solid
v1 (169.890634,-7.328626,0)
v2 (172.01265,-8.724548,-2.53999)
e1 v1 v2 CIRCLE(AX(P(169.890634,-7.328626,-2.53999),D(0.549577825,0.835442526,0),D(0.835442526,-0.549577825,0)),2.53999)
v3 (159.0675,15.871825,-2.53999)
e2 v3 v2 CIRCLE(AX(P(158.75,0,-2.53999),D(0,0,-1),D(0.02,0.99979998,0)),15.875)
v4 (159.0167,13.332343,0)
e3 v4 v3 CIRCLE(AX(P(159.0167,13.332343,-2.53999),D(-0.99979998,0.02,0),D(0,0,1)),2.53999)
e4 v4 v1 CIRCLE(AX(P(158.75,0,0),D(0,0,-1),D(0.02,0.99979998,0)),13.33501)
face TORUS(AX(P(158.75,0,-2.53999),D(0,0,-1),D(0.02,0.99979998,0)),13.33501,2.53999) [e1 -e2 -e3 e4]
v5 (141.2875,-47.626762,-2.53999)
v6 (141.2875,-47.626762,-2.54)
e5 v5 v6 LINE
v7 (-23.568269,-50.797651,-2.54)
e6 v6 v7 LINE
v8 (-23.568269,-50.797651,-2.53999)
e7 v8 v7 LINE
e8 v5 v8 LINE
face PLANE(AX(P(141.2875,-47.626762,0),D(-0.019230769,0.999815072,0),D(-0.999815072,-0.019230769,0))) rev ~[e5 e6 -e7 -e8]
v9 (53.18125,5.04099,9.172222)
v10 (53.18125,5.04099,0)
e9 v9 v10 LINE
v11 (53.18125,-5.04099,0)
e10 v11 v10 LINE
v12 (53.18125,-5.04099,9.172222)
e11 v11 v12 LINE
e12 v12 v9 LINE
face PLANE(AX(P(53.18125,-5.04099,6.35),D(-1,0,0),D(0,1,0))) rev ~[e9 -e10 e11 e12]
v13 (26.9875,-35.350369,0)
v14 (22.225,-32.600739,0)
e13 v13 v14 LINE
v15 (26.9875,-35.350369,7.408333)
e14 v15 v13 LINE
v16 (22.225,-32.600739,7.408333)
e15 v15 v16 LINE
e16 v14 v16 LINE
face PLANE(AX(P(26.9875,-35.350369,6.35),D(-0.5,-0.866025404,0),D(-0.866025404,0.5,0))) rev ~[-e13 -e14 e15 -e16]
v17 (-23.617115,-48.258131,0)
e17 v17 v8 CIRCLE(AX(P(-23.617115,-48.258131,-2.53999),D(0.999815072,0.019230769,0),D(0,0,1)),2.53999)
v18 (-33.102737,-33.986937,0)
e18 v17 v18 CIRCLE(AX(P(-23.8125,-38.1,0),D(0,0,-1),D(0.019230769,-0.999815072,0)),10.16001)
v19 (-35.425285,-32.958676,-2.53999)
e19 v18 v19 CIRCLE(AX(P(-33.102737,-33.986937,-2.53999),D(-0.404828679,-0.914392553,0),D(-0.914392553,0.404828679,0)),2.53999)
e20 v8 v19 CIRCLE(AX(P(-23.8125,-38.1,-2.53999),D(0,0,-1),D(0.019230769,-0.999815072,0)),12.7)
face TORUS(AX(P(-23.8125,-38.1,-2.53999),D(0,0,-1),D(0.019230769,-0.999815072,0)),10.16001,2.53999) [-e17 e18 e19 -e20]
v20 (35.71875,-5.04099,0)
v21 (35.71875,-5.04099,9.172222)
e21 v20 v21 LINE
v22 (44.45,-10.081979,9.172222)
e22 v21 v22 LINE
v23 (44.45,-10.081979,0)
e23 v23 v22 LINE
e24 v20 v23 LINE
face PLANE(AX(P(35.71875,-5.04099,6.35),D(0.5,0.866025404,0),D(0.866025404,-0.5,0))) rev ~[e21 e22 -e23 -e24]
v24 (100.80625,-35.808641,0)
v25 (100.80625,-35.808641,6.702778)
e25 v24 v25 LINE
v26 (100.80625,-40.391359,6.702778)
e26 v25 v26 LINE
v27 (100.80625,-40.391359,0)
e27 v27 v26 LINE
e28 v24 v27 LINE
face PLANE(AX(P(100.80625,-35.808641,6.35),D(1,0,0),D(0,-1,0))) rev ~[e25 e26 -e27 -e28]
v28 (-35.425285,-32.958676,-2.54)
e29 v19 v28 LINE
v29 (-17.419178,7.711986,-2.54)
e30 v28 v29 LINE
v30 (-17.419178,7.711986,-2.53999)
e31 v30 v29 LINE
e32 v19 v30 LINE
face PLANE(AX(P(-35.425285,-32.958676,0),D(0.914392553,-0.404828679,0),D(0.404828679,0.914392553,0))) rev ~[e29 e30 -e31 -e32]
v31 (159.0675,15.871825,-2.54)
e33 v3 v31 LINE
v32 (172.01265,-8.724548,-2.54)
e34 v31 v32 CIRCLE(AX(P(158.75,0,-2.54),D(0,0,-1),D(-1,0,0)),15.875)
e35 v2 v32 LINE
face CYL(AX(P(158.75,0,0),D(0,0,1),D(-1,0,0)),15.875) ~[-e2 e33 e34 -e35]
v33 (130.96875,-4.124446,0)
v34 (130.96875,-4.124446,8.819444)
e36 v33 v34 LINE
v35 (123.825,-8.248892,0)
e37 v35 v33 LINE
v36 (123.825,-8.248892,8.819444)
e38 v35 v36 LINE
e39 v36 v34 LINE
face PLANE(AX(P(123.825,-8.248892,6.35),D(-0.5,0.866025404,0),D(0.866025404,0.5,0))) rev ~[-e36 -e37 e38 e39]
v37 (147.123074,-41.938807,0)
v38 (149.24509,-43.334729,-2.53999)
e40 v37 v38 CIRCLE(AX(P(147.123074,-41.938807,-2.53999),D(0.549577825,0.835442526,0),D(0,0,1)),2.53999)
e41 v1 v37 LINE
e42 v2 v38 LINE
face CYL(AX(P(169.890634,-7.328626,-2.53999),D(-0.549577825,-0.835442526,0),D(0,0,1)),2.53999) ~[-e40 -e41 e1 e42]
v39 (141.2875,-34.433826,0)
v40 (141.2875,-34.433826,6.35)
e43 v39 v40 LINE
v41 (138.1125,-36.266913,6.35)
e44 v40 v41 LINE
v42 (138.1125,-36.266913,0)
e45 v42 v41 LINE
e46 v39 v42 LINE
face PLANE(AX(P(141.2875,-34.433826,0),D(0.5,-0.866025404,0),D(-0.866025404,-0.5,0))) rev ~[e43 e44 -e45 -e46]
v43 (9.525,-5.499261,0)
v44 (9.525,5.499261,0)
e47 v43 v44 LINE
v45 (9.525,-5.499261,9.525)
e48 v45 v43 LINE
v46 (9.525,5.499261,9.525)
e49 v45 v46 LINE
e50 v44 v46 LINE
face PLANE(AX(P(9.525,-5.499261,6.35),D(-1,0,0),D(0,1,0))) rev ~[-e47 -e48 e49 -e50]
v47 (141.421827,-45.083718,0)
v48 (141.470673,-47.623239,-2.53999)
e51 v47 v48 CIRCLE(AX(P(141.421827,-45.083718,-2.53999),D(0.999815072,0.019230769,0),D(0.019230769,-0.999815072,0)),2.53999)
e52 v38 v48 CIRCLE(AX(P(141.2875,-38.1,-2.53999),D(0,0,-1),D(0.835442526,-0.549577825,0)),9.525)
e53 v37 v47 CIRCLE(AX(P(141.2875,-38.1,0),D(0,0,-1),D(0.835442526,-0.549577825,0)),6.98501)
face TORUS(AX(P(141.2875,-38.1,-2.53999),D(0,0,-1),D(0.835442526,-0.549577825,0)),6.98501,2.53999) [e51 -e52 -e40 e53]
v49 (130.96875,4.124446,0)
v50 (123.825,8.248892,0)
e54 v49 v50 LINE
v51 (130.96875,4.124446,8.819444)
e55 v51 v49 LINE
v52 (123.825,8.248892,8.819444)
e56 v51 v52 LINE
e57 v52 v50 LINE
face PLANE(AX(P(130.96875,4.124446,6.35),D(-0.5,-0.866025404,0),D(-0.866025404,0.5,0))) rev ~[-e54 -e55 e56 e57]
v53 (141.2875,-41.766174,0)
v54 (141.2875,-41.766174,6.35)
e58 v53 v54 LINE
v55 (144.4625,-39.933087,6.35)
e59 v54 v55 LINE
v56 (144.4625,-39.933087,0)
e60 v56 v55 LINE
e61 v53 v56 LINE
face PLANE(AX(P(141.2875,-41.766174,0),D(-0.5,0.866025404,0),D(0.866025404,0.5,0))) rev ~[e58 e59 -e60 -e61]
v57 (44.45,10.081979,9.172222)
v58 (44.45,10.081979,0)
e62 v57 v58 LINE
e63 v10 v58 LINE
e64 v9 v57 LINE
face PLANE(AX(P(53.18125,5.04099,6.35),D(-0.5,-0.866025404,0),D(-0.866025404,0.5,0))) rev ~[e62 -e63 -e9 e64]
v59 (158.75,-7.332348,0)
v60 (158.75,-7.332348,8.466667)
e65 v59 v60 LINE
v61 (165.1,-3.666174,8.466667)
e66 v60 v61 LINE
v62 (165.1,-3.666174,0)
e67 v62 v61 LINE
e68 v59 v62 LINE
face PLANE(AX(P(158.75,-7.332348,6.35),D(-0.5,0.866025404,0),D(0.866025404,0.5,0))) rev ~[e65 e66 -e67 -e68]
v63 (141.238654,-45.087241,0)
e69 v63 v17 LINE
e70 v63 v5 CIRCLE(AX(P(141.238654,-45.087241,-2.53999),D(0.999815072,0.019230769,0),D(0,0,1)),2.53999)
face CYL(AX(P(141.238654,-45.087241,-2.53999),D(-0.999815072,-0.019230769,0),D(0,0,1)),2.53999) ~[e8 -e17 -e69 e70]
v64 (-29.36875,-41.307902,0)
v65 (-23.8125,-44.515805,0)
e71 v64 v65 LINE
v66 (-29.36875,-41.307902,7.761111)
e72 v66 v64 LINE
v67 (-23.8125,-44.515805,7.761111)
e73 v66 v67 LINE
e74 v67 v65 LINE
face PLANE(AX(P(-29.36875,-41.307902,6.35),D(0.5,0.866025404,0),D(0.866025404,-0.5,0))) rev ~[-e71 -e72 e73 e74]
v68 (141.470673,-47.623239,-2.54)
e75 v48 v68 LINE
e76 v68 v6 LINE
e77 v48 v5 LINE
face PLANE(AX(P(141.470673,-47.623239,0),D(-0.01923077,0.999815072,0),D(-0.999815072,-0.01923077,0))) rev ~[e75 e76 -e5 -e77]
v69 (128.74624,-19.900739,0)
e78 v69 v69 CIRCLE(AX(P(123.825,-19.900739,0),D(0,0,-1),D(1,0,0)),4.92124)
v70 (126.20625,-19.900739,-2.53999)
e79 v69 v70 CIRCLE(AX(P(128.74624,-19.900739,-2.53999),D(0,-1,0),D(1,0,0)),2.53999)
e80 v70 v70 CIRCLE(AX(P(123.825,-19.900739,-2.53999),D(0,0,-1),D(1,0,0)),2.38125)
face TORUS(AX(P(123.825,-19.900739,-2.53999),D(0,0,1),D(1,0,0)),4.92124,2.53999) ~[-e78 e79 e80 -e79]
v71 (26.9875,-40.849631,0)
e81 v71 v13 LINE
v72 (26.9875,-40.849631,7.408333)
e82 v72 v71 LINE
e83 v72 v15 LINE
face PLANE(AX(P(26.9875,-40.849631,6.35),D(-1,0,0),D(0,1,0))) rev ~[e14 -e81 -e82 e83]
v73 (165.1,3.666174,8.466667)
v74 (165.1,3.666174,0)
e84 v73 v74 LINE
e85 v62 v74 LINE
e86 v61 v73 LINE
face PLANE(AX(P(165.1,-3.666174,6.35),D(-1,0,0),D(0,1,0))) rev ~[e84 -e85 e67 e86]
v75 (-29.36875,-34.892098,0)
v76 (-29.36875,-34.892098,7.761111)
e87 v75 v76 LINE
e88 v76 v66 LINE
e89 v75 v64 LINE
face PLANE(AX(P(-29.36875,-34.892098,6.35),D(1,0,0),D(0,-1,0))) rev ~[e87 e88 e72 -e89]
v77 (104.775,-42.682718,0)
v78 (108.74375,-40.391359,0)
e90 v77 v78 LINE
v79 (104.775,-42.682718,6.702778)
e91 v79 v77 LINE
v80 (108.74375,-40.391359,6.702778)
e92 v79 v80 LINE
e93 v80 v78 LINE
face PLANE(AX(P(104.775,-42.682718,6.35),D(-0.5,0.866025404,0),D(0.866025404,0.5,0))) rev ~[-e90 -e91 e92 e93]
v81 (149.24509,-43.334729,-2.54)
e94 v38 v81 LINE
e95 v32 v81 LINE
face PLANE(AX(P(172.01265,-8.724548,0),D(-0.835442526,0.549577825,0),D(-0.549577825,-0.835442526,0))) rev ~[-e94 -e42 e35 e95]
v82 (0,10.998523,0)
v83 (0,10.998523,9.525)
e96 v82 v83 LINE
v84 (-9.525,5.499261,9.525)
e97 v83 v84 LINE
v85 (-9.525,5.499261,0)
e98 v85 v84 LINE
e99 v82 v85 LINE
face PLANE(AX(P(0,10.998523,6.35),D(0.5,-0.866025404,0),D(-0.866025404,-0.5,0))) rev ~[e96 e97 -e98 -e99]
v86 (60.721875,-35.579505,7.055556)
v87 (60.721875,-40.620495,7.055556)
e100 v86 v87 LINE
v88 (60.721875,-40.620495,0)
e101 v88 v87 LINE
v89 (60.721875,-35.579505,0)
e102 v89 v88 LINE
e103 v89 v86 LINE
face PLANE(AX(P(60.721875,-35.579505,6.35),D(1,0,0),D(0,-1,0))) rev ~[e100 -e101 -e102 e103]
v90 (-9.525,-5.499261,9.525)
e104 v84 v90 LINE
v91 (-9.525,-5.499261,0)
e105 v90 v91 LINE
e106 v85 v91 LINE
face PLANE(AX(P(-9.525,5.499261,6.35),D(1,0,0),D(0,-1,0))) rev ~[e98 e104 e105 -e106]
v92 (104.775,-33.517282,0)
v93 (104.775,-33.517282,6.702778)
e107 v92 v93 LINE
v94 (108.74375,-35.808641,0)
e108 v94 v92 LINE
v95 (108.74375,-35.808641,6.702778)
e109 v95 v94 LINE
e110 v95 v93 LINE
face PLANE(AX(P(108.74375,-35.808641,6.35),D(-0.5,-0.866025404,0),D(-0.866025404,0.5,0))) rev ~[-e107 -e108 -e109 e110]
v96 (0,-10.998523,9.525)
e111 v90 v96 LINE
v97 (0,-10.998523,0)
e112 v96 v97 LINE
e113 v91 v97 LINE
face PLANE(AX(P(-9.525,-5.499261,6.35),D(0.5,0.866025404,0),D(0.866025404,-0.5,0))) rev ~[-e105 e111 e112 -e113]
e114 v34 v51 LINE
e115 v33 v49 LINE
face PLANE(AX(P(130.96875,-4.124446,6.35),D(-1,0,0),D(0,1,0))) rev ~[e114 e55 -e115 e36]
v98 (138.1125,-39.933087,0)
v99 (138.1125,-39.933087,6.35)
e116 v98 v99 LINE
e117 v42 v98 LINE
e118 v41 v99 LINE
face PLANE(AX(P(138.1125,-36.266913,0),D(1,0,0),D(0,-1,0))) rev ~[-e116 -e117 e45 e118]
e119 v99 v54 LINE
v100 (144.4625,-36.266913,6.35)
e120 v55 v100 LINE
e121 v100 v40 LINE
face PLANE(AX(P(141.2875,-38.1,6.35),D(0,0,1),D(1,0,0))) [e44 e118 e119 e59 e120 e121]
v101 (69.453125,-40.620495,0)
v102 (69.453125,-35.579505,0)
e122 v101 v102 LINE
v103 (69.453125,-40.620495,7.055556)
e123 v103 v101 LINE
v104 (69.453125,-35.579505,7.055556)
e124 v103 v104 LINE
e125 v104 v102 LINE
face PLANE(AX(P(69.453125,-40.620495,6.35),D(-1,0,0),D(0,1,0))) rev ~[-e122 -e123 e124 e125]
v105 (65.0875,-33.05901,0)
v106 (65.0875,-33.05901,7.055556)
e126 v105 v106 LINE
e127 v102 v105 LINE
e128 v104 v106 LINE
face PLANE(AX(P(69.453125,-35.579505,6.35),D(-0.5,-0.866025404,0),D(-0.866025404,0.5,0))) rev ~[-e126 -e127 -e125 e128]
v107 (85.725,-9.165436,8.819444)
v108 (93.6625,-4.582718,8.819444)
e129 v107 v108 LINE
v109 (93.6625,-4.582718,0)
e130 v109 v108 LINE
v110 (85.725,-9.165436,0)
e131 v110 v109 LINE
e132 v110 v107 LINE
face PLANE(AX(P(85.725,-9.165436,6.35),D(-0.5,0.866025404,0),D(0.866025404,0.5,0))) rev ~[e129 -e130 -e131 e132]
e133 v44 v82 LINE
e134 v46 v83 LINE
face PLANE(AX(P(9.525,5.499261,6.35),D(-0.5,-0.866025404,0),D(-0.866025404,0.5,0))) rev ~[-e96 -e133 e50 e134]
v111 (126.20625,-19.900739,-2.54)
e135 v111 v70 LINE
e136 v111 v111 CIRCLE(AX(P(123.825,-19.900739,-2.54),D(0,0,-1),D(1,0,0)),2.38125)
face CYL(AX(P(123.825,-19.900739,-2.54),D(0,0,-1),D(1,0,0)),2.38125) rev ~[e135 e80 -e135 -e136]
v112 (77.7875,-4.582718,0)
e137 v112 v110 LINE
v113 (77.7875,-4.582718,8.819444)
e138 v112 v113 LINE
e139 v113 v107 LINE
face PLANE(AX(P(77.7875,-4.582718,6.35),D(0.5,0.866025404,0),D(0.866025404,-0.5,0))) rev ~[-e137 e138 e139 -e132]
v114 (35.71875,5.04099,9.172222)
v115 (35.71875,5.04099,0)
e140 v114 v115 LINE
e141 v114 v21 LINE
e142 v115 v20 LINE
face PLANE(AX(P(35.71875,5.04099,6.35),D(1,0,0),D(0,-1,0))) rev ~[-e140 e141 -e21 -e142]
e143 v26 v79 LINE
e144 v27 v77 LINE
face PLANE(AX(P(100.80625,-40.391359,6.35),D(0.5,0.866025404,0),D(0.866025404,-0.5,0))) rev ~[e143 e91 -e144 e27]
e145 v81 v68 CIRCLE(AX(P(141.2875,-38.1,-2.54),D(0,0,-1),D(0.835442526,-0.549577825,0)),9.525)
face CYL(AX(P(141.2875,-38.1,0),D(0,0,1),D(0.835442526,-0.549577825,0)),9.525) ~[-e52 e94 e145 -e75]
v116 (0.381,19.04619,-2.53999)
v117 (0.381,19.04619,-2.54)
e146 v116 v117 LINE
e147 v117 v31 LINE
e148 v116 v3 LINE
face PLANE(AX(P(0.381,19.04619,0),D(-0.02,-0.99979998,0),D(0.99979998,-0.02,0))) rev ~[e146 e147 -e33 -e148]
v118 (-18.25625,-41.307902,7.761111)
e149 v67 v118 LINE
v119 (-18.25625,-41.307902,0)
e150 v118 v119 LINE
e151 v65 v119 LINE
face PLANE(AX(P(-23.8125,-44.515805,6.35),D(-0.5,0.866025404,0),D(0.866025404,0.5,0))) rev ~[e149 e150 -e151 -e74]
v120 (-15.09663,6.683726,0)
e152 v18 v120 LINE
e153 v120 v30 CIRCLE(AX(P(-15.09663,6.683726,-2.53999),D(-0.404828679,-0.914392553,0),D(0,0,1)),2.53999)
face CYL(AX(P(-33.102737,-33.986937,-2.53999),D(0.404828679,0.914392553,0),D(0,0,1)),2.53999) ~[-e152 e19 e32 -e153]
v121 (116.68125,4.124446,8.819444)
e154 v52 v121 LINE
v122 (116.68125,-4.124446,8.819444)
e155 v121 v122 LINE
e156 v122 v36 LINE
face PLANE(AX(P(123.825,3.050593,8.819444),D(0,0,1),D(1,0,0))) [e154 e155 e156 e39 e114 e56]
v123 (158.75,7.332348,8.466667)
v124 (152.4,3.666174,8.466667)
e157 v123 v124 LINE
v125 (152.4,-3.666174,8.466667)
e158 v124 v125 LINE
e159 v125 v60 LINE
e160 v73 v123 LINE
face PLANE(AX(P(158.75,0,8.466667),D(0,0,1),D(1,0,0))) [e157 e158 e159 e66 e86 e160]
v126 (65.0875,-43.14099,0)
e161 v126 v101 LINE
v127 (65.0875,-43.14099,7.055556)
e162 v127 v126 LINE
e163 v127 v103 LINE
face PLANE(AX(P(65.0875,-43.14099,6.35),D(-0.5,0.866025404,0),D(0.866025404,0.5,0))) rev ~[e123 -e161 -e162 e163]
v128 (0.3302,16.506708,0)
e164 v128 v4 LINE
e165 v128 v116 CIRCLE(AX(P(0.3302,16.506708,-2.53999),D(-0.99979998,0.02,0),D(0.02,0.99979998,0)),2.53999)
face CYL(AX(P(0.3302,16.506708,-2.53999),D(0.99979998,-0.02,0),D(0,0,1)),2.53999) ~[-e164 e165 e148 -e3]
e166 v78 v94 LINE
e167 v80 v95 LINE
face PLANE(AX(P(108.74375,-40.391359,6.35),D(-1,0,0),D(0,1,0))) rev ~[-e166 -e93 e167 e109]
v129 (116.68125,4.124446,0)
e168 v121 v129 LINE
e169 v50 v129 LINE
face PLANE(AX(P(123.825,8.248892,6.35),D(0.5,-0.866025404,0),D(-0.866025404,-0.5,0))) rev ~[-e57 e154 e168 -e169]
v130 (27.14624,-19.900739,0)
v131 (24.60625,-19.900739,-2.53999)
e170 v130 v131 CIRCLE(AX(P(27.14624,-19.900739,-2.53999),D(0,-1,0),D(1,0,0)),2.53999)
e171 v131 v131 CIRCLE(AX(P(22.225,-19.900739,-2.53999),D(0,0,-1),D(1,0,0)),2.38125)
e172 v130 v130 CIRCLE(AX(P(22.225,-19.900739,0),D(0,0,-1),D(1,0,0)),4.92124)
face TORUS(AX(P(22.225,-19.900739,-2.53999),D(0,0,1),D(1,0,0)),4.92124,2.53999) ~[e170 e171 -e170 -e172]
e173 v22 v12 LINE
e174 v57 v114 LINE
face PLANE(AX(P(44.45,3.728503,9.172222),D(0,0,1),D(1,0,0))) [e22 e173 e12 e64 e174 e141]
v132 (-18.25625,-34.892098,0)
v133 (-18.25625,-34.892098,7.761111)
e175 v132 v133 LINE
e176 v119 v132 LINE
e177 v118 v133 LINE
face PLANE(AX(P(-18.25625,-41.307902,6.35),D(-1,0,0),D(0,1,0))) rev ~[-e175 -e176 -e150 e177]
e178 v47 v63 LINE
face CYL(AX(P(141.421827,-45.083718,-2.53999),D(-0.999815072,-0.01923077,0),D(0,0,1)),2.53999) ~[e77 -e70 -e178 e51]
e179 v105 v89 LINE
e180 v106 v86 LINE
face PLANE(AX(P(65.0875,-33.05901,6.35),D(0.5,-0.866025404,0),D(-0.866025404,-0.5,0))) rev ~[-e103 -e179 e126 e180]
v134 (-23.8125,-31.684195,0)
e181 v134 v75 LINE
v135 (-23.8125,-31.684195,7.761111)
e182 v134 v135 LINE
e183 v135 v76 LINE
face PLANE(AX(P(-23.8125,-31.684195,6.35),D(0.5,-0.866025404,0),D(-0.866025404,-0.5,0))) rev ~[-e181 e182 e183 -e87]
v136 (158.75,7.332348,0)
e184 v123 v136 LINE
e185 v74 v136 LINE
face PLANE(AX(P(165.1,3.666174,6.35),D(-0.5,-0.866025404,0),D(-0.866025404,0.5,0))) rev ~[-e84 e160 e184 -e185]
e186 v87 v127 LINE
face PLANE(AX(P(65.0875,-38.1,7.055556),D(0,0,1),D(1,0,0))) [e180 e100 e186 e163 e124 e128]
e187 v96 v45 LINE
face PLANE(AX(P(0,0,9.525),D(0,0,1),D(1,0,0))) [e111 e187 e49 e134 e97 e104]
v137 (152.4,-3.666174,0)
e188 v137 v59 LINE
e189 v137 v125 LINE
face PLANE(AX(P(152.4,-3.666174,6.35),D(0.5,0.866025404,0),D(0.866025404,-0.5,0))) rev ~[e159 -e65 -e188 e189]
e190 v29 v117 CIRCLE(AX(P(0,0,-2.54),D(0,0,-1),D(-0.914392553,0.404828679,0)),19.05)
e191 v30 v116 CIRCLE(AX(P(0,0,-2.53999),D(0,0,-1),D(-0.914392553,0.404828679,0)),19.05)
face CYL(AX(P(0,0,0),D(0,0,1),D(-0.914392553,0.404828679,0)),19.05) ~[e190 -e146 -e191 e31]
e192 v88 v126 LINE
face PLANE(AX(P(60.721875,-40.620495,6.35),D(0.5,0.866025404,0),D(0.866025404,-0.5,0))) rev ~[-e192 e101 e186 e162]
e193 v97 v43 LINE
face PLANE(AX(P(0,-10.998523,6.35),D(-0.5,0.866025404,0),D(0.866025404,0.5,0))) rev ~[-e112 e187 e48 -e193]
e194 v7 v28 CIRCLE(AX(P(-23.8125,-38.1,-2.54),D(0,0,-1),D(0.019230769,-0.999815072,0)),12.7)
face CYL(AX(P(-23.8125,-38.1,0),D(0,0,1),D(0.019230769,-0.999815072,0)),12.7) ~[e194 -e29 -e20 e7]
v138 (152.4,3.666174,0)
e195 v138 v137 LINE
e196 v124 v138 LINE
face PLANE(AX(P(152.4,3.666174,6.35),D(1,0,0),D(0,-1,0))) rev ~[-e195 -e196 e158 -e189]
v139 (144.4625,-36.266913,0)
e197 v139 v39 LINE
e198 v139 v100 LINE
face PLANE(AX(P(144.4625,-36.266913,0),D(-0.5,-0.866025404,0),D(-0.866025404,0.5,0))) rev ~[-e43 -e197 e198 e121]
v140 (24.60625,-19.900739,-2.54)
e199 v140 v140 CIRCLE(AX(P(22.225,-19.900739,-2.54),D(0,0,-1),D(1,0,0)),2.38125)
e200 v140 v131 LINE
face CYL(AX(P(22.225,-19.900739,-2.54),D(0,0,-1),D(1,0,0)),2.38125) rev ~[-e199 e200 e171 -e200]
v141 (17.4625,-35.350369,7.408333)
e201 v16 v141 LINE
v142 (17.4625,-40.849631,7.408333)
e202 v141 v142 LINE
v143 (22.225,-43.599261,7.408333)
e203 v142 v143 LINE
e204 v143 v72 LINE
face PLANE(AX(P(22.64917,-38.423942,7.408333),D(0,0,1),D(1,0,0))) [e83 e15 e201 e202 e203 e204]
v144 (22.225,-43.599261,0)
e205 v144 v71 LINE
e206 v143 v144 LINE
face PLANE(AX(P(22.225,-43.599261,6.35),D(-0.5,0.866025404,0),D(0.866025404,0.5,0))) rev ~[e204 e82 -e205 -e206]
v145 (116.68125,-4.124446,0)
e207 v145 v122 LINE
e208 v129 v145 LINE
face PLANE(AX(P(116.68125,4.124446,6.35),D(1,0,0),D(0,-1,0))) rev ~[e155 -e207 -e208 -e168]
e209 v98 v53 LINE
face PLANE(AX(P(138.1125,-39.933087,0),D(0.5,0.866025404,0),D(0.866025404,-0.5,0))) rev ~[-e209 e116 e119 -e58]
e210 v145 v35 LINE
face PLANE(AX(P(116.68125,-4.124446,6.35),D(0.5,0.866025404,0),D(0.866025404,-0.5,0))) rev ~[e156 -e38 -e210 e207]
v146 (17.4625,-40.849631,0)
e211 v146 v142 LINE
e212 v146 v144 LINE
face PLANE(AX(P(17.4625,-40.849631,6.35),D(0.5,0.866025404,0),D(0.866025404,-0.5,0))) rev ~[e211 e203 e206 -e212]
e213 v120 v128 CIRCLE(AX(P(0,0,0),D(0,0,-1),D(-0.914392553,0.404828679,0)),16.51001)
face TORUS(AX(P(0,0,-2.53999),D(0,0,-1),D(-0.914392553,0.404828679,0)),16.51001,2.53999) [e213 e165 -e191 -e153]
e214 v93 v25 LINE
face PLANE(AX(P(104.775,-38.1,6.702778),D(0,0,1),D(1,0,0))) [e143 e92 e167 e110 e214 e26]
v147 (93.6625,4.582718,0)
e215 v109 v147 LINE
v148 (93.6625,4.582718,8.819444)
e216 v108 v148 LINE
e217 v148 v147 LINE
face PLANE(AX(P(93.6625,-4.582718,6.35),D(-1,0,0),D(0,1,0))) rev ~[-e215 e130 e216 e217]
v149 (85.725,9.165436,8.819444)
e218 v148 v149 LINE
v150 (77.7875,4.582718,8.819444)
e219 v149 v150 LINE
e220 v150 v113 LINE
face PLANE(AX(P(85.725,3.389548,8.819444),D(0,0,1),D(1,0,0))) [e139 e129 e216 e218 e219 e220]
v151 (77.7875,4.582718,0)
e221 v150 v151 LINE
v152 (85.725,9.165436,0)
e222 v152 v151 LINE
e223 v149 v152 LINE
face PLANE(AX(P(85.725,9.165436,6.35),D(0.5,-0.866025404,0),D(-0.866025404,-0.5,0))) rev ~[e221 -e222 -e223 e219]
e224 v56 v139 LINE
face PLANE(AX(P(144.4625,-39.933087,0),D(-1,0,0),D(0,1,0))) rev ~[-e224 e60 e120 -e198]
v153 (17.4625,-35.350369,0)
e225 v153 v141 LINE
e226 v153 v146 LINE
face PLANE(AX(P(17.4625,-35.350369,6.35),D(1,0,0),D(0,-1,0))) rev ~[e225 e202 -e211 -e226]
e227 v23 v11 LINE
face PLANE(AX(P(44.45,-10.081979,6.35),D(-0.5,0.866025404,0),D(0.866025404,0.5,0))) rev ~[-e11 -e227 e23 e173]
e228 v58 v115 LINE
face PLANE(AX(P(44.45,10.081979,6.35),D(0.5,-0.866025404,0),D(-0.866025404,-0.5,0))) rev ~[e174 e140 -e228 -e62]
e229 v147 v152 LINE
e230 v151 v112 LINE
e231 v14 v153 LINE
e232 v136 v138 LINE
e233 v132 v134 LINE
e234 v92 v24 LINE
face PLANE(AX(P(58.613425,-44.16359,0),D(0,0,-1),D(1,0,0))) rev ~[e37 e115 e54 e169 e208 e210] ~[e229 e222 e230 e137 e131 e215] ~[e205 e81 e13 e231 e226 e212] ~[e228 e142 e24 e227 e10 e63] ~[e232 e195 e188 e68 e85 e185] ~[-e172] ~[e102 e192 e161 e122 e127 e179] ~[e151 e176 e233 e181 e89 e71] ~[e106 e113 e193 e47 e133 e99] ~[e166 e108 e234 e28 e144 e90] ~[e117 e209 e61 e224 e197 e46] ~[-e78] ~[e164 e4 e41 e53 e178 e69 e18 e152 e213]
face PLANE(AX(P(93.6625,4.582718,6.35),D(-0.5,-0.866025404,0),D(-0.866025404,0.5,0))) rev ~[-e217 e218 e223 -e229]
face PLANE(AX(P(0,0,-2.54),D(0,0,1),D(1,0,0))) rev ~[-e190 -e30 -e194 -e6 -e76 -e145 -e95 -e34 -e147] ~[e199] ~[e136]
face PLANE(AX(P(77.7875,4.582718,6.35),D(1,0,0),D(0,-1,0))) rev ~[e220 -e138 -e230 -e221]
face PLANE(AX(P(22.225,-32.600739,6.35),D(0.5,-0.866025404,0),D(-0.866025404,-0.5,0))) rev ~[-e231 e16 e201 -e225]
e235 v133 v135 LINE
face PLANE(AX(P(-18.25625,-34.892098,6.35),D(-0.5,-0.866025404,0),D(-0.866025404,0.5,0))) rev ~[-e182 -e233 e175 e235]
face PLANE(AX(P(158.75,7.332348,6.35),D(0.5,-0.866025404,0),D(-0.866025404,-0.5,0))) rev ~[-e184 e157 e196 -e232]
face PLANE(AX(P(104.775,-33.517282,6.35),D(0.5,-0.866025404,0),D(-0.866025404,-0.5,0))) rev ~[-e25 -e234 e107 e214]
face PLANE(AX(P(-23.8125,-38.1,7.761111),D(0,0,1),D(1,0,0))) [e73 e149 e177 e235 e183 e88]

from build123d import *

# Parameters (mm, degrees)
F1_DEPTH  = 6.35
F2_DEPTH  = 3.175
F3_DEPTH  = 2.8222222222
F4_DEPTH  = 2.4694444444
F5_DEPTH  = 2.4694444444
F6_DEPTH  = 2.1166666667
F7_DEPTH  = 1.4111111111
F8_DEPTH  = 1.0583333333
F9_DEPTH  = 0.3527777778
F10_DEPTH = 0.7055555556
F12_DEPTH = 2.54
F13_R     = 2.38125
F14_DEPTH = 25.4
F15_R     = 2.53999
F16_R     = 2.53999
F18_DEPTH = 2.54


# Not quite as in the source:
# - a fillet or chamfer is up to 0.001 mm smaller than in the source, because OpenCascade refuses the exact size


with BuildPart() as f1:
    # F0 (on Top) → F1 (new body)
    with BuildSketch(Plane.XY):
        Polygon((152.4, 3.6661742094), (152.4, 0), (152.4, -3.6661742094), (158.75, -7.3323484187), (165.1, -3.6661742094), (165.1, 3.6661742094), (158.75, 7.3323484187), align=None)
    extrude(amount=F1_DEPTH)

    # F6 (add): a face of the model
    f6_faces = [f1.faces().sort_by_distance(p)[0] for p in [
        (158.75, 0, 6.35),
    ]]
    extrude(f6_faces, amount=F6_DEPTH)


with BuildPart() as f1b:
    # F0 (on Top) → F1, piece 2 (new body)
    with BuildSketch(Plane.XY):
        Polygon((144.4625, -36.2669128953), (141.2875, -34.4338257906), (138.1125, -36.2669128953), (138.1125, -39.9330871047), (141.2875, -41.7661742094), (144.4625, -39.9330871047), align=None)
    extrude(amount=F1_DEPTH)


with BuildPart() as f1c:
    # F0 (on Top) → F1, piece 3 (new body)
    with BuildSketch(Plane.XY):
        Polygon((116.68125, 4.1244459855), (116.68125, 0), (123.825, 0), (130.96875, 0), (130.96875, 4.1244459855), (123.825, 8.248891971), align=None)
        Polygon((123.825, 0), (116.68125, 0), (116.68125, -4.1244459855), (123.825, -8.248891971), (130.96875, -4.1244459855), (130.96875, 0), align=None)
    extrude(amount=F1_DEPTH)

    # F5 (add): a face of the model
    f5_faces = [f1c.faces().sort_by_distance(p)[0] for p in [
        (123.825, 0, 6.35),
    ]]
    extrude(f5_faces, amount=F5_DEPTH)


with BuildPart() as f1d:
    # F0 (on Top) → F1, piece 4 (new body)
    with BuildSketch(Plane.XY):
        Polygon((108.74375, -35.8086411192), (104.775, -33.5172822383), (100.80625, -35.8086411192), (100.80625, -40.3913588808), (104.775, -42.6827177617), (108.74375, -40.3913588808), align=None)
    extrude(amount=F1_DEPTH)

    # F9 (add): a face of the model
    f9_faces = [f1d.faces().sort_by_distance(p)[0] for p in [
        (104.775, -38.1, 6.35),
    ]]
    extrude(f9_faces, amount=F9_DEPTH)


with BuildPart() as f1e:
    # F0 (on Top) → F1, piece 5 (new body)
    with BuildSketch(Plane.XY):
        Polygon((77.7875, 4.5827177617), (77.7875, 0), (85.725, 0), (93.6625, 0), (93.6625, 4.5827177617), (85.725, 9.1654355234), align=None)
        Polygon((85.725, 0), (77.7875, 0), (77.7875, -4.5827177617), (85.725, -9.1654355234), (93.6625, -4.5827177617), (93.6625, 0), align=None)
    extrude(amount=F1_DEPTH)

    # F4 (add): a face of the model
    f4_faces = [f1e.faces().sort_by_distance(p)[0] for p in [
        (85.725, 0, 6.35),
    ]]
    extrude(f4_faces, amount=F4_DEPTH)


with BuildPart() as f1f:
    # F0 (on Top) → F1, piece 6 (new body)
    with BuildSketch(Plane.XY):
        Polygon((69.453125, -35.5795052311), (65.0875, -33.0590104621), (60.721875, -35.5795052311), (60.721875, -40.6204947689), (65.0875, -43.1409895379), (69.453125, -40.6204947689), align=None)
    extrude(amount=F1_DEPTH)

    # F10 (add): a face of the model
    f10_faces = [f1f.faces().sort_by_distance(p)[0] for p in [
        (65.0875, -38.1, 6.35),
    ]]
    extrude(f10_faces, amount=F10_DEPTH)


with BuildPart() as f1g:
    # F0 (on Top) → F1, piece 7 (new body)
    with BuildSketch(Plane.XY):
        Polygon((35.71875, 5.0409895379), (35.71875, 0), (44.45, 0), (53.18125, 0), (53.18125, 5.0409895379), (44.45, 10.0819790757), align=None)
        Polygon((44.45, 0), (35.71875, 0), (35.71875, -5.0409895379), (44.45, -10.0819790757), (53.18125, -5.0409895379), (53.18125, 0), align=None)
    extrude(amount=F1_DEPTH)

    # F3 (add): a face of the model
    f3_faces = [f1g.faces().sort_by_distance(p)[0] for p in [
        (44.45, 0, 6.35),
    ]]
    extrude(f3_faces, amount=F3_DEPTH)


with BuildPart() as f1h:
    # F0 (on Top) → F1, piece 8 (new body)
    with BuildSketch(Plane.XY):
        Polygon((-18.25625, -41.3079024332), (-18.25625, -38.1), (-18.25625, -34.8920975668), (-23.8125, -31.6841951336), (-29.36875, -34.8920975668), (-29.36875, -41.3079024332), (-23.8125, -44.5158048664), align=None)
    extrude(amount=F1_DEPTH)

    # F7 (add): a face of the model
    f7_faces = [f1h.faces().sort_by_distance(p)[0] for p in [
        (-23.8125, -38.1, 6.35),
    ]]
    extrude(f7_faces, amount=F7_DEPTH)


with BuildPart() as f1i:
    # F0 (on Top) → F1, piece 9 (new body)
    with BuildSketch(Plane.XY):
        Polygon((26.9875, -35.350369343), (22.225, -32.600738686), (22.225, -38.1), (17.4625, -38.1), (17.4625, -40.849630657), (22.225, -43.599261314), (26.9875, -40.849630657), align=None)
        Polygon((22.225, -38.1), (22.225, -32.600738686), (17.4625, -35.350369343), (17.4625, -38.1), align=None)
    extrude(amount=F1_DEPTH)

    # F8 (add): a face of the model
    f8_faces = [f1i.faces().sort_by_distance(p)[0] for p in [
        (22.225, -38.1, 6.35),
    ]]
    extrude(f8_faces, amount=F8_DEPTH)


with BuildPart() as f1j:
    # F0 (on Top) → F1, piece 10 (new body)
    with BuildSketch(Plane.XY):
        Polygon((9.525, -5.499261314), (9.525, 0), (9.525, 5.499261314), (0, 10.9985226281), (-9.525, 5.499261314), (-9.525, -5.499261314), (0, -10.9985226281), align=None)
    extrude(amount=F1_DEPTH)

    # F2 (add): a face of the model
    f2_faces = [f1j.faces().sort_by_distance(p)[0] for p in [
        (0, 0, 6.35),
    ]]
    extrude(f2_faces, amount=F2_DEPTH)


with BuildPart() as f12:
    # F11 (on face) → F12 (new body)
    with BuildSketch(Plane(origin=(0, 0, 0), x_dir=(1, 0, 0), z_dir=(0, 0, -1))):
        with BuildLine():
            Line((141.2875, 47.6267617683), (-23.5682692308, 50.7976514101))
            ThreePointArc((-23.5682692308, 50.7976514101), (-14.7463064556, 46.9934883266), (-11.1125, 38.1))
            Line((-11.1125, 38.1), (131.7625, 38.1))
            ThreePointArc((131.7625, 38.1), (134.617383755, 44.8996451583), (141.4706730769, 47.6232385575))
            Line((141.4706730769, 47.6232385575), (141.2875, 47.6267617683))
        make_face()
        with BuildLine():
            Line((-35.4252854215, 32.9586757782), (-17.4191781323, -7.7119863327))
            ThreePointArc((-17.4191781323, -7.7119863327), (-10.2318580693, -16.0689632662), (0.381, -19.0461896189))
            ThreePointArc((0.381, -19.0461896189), (13.6044211564, -13.335), (19.05, 0))
            Line((19.05, 0), (142.875, 0))
            ThreePointArc((142.875, 0), (147.6375, -11.3370176303), (159.0675, -15.8718246824))
            ThreePointArc((159.0675, -15.8718246824), (172.7981495603, -7.3935863375), (172.0126501051, 8.7245479648))
            Line((172.0126501051, 8.7245479648), (149.245090063, 43.3347287789))
            ThreePointArc((149.245090063, 43.3347287789), (145.8881342123, 46.4402511859), (141.4706730769, 47.6232385575))
            ThreePointArc((141.4706730769, 47.6232385575), (134.617383755, 44.8996451583), (131.7625, 38.1))
            Line((131.7625, 38.1), (-11.1125, 38.1))
            ThreePointArc((-11.1125, 38.1), (-14.7463064556, 46.9934883266), (-23.5682692308, 50.7976514101))
            ThreePointArc((-23.5682692308, 50.7976514101), (-34.3892798322, 45.1300589173), (-35.4252854215, 32.9586757782))
        make_face()
        Polygon((9.525, 5.499261314), (9.525, 0), (9.525, -5.499261314), (0, -10.9985226281), (-9.525, -5.499261314), (-9.525, 5.499261314), (0, 10.9985226281), align=None, mode=Mode.SUBTRACT)
        with BuildLine():
            ThreePointArc((19.05, 0), (13.6044211564, -13.335), (0.381, -19.0461896189))
            Line((0.381, -19.0461896189), (159.0675, -15.8718246824))
            ThreePointArc((159.0675, -15.8718246824), (147.6375, -11.3370176303), (142.875, 0))
            Line((142.875, 0), (19.05, 0))
        make_face()
    extrude(amount=F12_DEPTH)

    # F13 (on face) → F14 (cut)
    with BuildSketch(Plane(origin=(0, 0, -2.54), x_dir=(1, 0, 0), z_dir=(0, 0, -1))):
        with Locations((22.225, 19.900738686)):
            Circle(F13_R)
        with Locations((123.825, 19.900738686)):
            Circle(F13_R)
    extrude(amount=-F14_DEPTH, mode=Mode.SUBTRACT)

    # F15 (radius 2.54 in the source; OpenCascade refuses exactly that, so slightly less here)
    f15_edges = [f12.edges().sort_by_distance(p)[0] for p in [
        (19.84375, -19.900739, 0),
    ]]
    fillet(f15_edges, radius=F15_R)

    # F16 (radius 2.54 in the source; OpenCascade refuses exactly that, so slightly less here)
    f16_edges = [f12.edges().sort_by_distance(p)[0] for p in [
        (58.951202, -49.210445, 0),
        (121.44375, -19.900739, 0),
    ]]
    fillet(f16_edges, radius=F16_R)


with BuildPart() as f1j_1:
    add(f1j.part)

    # F17: union F1g, F1e, F1c, F1, F1h, F1i, F1f, F1d, F1b, F12
    add(f1g.part)
    add(f1e.part)
    add(f1c.part)
    add(f1.part)
    add(f1h.part)
    add(f1i.part)
    add(f1f.part)
    add(f1d.part)
    add(f1b.part)
    add(f12.part)

    # F18 (add, through all): a face of the model
    f18_faces = [f1j_1.faces().sort_by_distance(p)[0] for p in [
        (0, 0, 0),
    ]]
    extrude(f18_faces, amount=F18_DEPTH)


solid = f1j_1.part
